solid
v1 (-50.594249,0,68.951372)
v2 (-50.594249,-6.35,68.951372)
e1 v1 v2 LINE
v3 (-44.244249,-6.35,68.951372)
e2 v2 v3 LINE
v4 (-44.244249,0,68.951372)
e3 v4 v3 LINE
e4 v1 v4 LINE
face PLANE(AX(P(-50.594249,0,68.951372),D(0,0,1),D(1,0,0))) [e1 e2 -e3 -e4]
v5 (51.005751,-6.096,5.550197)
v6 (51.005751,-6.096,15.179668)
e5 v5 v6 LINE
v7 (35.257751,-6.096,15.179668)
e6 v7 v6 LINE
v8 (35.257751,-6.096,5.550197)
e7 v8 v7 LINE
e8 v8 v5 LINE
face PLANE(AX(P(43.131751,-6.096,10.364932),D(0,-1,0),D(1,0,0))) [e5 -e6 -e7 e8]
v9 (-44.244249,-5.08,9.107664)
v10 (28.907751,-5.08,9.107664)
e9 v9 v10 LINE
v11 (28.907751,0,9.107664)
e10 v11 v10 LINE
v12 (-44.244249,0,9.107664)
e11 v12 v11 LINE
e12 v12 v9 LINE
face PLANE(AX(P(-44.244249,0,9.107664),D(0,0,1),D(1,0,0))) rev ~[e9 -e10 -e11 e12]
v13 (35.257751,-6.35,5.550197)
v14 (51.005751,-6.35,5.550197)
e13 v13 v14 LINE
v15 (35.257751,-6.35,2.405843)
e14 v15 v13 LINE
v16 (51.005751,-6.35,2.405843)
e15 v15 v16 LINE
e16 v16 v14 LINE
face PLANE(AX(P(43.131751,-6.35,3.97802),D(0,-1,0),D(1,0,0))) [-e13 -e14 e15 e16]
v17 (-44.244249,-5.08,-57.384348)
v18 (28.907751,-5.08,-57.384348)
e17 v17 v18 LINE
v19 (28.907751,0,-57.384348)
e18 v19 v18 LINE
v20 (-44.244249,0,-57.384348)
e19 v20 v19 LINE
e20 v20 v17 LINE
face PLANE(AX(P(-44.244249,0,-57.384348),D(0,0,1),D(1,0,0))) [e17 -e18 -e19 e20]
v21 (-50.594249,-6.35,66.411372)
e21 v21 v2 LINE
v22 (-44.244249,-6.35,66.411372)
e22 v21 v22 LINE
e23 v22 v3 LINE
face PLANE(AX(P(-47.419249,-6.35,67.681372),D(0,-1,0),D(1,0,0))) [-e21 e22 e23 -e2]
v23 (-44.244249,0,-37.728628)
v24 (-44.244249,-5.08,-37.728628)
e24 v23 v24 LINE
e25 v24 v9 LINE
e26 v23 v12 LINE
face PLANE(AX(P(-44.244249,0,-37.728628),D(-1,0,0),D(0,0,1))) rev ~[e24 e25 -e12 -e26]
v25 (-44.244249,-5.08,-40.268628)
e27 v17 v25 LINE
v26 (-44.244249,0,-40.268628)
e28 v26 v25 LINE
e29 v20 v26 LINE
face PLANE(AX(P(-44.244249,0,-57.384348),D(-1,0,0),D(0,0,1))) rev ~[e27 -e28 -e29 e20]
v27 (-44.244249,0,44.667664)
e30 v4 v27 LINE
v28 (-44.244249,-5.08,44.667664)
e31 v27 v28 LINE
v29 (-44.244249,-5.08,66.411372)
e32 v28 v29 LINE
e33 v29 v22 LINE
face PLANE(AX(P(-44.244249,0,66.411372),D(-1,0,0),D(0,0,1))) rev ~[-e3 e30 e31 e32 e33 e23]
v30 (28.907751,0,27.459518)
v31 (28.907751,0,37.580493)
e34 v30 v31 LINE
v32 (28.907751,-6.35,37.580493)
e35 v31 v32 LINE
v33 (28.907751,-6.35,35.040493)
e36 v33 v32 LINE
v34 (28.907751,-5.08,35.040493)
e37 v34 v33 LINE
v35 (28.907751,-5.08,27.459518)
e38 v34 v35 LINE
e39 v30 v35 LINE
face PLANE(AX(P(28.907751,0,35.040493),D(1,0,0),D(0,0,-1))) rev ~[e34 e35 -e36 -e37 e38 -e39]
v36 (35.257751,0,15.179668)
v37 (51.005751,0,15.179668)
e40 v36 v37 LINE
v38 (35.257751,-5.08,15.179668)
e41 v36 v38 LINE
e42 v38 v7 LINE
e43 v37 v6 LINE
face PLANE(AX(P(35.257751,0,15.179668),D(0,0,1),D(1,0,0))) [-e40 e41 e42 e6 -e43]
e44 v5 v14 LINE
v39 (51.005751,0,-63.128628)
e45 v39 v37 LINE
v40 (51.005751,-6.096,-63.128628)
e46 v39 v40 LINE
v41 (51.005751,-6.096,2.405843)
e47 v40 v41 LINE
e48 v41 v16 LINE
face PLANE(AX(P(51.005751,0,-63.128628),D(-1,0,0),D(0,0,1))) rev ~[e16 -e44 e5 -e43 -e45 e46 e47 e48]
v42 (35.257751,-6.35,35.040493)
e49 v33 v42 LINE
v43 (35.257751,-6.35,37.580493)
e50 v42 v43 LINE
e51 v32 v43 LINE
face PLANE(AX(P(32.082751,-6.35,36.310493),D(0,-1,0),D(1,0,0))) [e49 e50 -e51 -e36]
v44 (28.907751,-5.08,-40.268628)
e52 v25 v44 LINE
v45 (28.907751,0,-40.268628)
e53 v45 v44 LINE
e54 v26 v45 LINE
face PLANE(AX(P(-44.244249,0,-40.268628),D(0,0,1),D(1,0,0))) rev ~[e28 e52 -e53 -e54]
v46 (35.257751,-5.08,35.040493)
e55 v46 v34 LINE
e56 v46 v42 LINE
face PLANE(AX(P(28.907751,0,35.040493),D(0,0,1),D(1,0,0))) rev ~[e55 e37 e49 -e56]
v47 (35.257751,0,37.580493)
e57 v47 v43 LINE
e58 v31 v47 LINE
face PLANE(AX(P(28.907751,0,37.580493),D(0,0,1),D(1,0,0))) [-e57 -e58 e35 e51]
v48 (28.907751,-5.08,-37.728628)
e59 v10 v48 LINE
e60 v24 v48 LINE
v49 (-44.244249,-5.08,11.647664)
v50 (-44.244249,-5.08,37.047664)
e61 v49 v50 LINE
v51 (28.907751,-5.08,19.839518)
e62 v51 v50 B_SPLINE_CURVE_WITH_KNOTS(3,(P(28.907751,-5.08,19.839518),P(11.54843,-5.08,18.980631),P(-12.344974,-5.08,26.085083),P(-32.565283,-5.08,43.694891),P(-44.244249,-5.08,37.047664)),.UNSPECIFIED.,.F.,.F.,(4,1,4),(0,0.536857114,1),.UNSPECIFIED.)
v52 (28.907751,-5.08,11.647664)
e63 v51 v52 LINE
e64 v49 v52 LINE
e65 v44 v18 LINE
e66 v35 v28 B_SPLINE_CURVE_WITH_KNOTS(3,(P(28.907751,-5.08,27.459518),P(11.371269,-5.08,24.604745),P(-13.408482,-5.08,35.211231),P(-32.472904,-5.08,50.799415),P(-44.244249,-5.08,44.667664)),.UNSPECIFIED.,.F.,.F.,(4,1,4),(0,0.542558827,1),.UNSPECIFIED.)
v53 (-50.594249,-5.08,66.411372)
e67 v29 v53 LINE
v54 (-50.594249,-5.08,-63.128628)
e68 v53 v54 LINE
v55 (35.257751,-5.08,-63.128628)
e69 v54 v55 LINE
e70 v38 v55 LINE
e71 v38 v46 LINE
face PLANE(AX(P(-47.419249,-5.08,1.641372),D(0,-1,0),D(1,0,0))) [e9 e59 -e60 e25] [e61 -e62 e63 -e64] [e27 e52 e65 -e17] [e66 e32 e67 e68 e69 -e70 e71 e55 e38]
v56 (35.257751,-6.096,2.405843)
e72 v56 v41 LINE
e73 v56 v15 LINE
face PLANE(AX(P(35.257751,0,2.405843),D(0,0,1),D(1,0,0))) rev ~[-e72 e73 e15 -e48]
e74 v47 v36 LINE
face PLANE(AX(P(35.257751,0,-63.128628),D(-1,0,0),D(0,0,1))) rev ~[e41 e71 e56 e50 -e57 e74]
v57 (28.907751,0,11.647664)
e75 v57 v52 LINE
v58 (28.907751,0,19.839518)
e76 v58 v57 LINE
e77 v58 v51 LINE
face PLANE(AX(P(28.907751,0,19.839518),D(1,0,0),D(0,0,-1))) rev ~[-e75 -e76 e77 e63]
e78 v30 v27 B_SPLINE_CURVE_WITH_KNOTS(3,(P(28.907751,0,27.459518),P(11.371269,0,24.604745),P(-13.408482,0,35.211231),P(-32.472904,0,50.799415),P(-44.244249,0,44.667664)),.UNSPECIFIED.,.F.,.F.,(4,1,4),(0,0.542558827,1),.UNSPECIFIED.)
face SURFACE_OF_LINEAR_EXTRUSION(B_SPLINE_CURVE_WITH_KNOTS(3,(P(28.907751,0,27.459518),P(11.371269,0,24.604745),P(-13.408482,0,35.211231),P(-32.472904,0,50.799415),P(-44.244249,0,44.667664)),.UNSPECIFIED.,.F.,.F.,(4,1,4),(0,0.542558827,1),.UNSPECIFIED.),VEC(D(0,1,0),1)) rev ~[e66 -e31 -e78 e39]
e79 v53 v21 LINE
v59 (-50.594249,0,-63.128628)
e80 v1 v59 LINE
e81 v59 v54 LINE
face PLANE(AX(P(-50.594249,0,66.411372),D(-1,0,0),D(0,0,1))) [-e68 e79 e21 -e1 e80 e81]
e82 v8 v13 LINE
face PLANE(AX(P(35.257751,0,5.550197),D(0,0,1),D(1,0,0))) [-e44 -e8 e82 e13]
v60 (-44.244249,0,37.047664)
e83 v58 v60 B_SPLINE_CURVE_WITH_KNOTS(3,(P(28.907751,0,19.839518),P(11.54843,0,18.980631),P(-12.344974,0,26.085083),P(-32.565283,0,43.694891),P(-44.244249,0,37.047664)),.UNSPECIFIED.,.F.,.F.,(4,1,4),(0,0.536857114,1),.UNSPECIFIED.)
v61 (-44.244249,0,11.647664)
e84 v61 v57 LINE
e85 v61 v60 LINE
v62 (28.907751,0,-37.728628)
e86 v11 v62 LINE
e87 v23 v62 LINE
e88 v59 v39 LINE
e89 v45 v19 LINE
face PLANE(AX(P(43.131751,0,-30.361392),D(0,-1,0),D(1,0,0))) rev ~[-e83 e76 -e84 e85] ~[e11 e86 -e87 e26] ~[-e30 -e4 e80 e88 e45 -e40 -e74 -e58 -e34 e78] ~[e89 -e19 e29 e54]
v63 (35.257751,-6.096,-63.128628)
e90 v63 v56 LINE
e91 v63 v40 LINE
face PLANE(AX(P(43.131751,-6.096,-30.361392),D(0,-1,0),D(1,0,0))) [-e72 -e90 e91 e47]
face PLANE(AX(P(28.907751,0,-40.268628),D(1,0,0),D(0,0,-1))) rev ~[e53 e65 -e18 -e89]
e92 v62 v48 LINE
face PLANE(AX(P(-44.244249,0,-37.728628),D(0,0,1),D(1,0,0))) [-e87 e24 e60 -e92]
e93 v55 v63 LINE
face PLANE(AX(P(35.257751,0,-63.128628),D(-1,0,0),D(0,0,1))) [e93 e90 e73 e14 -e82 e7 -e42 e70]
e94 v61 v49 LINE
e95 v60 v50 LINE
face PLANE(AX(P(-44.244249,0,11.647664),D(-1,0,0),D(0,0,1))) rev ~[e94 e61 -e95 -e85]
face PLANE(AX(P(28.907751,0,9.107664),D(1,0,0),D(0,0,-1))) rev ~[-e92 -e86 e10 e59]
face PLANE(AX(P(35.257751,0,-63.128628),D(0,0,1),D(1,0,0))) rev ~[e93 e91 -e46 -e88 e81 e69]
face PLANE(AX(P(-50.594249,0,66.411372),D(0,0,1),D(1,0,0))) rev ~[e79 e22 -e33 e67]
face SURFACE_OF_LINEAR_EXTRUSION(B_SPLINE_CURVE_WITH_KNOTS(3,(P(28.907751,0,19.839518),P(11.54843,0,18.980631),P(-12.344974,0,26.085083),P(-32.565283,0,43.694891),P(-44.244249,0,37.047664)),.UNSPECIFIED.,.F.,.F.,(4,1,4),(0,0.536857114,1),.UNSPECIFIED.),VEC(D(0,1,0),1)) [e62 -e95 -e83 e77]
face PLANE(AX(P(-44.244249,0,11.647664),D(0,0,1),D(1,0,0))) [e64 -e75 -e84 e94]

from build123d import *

# Parameters (mm, degrees)
F0_W     = 73.152
F0_H     = 5.744279672
F0_H_2   = 2.54
F1_DEPTH = 5.08
F0_W_2   = 6.35
F0_W_3   = 15.748
F0_H_3   = 3.1443536282
F2_DEPTH = 6.35
F0_H_4   = 65.5344708799
F0_H_5   = 9.6294713412
F3_DEPTH = 6.096


# Not quite as in the source:
# - a feature names something its author has since deleted; it is built from what else it names


with BuildPart() as f1:
    # F0 (on Front) → F1 (new body)
    with BuildSketch(Plane.XZ):
        Polygon((-44.2442491055, -63.1286278367), (-44.2442491055, -57.3843481647), (-44.2442491055, -40.2686278367), (-44.2442491055, -37.7286278367), (-44.2442491055, -32.8348538627), (-44.2442491055, -31.8823538627), (-44.2442491055, -30.9298538627), (-44.2442491055, -20.7698538627), (-44.2442491055, -19.8173538627), (-44.2442491055, -18.8648538627), (-44.2442491055, 9.1076644534), (-44.2442491055, 11.6476644534), (-44.2442491055, 15.1796680125), (-44.2442491055, 37.0476644534), (-44.2442491055, 44.6676644534), (-44.2442491055, 66.4113721633), (-50.5942491055, 66.4113721633), (-50.5942491055, -63.1286278367), align=None)
        with BuildLine():
            add(Edge.make_bspline(
                [(28.9077508945, 27.4595177274), (11.3712688144, 24.6047450509), (-13.4084815754, 35.2112312639), (-32.4729044871, 50.7994146886), (-44.2442491055, 44.6676644534)],
                knots=[0, 0, 0, 0, 0.5425588266, 1, 1, 1, 1], degree=3))
            Line((-44.2442491055, 44.6676644534), (-44.2442491055, 37.0476644534))
            add(Edge.make_bspline(
                [(28.9077508945, 19.8395177274), (11.5484302318, 18.9806314817), (-12.3449743232, 26.085082613), (-32.5652834278, 43.6948913941), (-44.2442491055, 37.0476644534)],
                knots=[0, 0, 0, 0, 0.5368571136, 1, 1, 1, 1], degree=3))
            Line((28.9077508945, 19.8395177274), (28.9077508945, 27.4595177274))
        make_face()
        Polygon((28.9077508945, -40.2686278367), (28.9077508945, -57.3843481647), (28.9077508945, -63.1286278367), (35.2577508945, -63.1286278367), (35.2577508945, 2.4058430432), (35.2577508945, 5.5501966713), (35.2577508945, 15.1796680125), (35.2577508945, 35.0404930887), (28.9077508945, 35.0404930887), (28.9077508945, 27.4595177274), (28.9077508945, 19.8395177274), (28.9077508945, 12.2195177274), (28.9077508945, 11.6476644534), (28.9077508945, 9.1076644534), (28.9077508945, -18.8648538627), (28.9077508945, -19.8173538627), (28.9077508945, -20.7698538627), (28.9077508945, -30.9298538627), (28.9077508945, -31.8823538627), (28.9077508945, -32.8348538627), (28.9077508945, -37.7286278367), align=None)
        with Locations((-7.6682491055, -60.2564880007)):
            Rectangle(F0_W, F0_H)
        with Locations((-7.6682491055, 10.3776644534)):
            Rectangle(F0_W, F0_H_2)
        with Locations((-7.6682491055, -38.9986278367)):
            Rectangle(F0_W, F0_H_2)
    extrude(amount=F1_DEPTH)

    # F0 (on Front) → F2 (join)
    with BuildSketch(Plane.XZ):
        with Locations((-47.4192491055, 67.6813721633)):
            Rectangle(F0_W_2, F0_H_2)
        with Locations((32.0827508945, 36.3104930887)):
            Rectangle(F0_W_2, F0_H_2)
        with Locations((43.1317508945, 3.9780198572)):
            Rectangle(F0_W_3, F0_H_3)
    extrude(amount=F2_DEPTH)

    # F0 (on Front) → F3 (join)
    with BuildSketch(Plane.XZ):
        with Locations((43.1317508945, -30.3613923968)):
            Rectangle(F0_W_3, F0_H_4)
        with Locations((43.1317508945, 10.3649323419)):
            Rectangle(F0_W_3, F0_H_5)
    extrude(amount=F3_DEPTH)


solid = f1.part
